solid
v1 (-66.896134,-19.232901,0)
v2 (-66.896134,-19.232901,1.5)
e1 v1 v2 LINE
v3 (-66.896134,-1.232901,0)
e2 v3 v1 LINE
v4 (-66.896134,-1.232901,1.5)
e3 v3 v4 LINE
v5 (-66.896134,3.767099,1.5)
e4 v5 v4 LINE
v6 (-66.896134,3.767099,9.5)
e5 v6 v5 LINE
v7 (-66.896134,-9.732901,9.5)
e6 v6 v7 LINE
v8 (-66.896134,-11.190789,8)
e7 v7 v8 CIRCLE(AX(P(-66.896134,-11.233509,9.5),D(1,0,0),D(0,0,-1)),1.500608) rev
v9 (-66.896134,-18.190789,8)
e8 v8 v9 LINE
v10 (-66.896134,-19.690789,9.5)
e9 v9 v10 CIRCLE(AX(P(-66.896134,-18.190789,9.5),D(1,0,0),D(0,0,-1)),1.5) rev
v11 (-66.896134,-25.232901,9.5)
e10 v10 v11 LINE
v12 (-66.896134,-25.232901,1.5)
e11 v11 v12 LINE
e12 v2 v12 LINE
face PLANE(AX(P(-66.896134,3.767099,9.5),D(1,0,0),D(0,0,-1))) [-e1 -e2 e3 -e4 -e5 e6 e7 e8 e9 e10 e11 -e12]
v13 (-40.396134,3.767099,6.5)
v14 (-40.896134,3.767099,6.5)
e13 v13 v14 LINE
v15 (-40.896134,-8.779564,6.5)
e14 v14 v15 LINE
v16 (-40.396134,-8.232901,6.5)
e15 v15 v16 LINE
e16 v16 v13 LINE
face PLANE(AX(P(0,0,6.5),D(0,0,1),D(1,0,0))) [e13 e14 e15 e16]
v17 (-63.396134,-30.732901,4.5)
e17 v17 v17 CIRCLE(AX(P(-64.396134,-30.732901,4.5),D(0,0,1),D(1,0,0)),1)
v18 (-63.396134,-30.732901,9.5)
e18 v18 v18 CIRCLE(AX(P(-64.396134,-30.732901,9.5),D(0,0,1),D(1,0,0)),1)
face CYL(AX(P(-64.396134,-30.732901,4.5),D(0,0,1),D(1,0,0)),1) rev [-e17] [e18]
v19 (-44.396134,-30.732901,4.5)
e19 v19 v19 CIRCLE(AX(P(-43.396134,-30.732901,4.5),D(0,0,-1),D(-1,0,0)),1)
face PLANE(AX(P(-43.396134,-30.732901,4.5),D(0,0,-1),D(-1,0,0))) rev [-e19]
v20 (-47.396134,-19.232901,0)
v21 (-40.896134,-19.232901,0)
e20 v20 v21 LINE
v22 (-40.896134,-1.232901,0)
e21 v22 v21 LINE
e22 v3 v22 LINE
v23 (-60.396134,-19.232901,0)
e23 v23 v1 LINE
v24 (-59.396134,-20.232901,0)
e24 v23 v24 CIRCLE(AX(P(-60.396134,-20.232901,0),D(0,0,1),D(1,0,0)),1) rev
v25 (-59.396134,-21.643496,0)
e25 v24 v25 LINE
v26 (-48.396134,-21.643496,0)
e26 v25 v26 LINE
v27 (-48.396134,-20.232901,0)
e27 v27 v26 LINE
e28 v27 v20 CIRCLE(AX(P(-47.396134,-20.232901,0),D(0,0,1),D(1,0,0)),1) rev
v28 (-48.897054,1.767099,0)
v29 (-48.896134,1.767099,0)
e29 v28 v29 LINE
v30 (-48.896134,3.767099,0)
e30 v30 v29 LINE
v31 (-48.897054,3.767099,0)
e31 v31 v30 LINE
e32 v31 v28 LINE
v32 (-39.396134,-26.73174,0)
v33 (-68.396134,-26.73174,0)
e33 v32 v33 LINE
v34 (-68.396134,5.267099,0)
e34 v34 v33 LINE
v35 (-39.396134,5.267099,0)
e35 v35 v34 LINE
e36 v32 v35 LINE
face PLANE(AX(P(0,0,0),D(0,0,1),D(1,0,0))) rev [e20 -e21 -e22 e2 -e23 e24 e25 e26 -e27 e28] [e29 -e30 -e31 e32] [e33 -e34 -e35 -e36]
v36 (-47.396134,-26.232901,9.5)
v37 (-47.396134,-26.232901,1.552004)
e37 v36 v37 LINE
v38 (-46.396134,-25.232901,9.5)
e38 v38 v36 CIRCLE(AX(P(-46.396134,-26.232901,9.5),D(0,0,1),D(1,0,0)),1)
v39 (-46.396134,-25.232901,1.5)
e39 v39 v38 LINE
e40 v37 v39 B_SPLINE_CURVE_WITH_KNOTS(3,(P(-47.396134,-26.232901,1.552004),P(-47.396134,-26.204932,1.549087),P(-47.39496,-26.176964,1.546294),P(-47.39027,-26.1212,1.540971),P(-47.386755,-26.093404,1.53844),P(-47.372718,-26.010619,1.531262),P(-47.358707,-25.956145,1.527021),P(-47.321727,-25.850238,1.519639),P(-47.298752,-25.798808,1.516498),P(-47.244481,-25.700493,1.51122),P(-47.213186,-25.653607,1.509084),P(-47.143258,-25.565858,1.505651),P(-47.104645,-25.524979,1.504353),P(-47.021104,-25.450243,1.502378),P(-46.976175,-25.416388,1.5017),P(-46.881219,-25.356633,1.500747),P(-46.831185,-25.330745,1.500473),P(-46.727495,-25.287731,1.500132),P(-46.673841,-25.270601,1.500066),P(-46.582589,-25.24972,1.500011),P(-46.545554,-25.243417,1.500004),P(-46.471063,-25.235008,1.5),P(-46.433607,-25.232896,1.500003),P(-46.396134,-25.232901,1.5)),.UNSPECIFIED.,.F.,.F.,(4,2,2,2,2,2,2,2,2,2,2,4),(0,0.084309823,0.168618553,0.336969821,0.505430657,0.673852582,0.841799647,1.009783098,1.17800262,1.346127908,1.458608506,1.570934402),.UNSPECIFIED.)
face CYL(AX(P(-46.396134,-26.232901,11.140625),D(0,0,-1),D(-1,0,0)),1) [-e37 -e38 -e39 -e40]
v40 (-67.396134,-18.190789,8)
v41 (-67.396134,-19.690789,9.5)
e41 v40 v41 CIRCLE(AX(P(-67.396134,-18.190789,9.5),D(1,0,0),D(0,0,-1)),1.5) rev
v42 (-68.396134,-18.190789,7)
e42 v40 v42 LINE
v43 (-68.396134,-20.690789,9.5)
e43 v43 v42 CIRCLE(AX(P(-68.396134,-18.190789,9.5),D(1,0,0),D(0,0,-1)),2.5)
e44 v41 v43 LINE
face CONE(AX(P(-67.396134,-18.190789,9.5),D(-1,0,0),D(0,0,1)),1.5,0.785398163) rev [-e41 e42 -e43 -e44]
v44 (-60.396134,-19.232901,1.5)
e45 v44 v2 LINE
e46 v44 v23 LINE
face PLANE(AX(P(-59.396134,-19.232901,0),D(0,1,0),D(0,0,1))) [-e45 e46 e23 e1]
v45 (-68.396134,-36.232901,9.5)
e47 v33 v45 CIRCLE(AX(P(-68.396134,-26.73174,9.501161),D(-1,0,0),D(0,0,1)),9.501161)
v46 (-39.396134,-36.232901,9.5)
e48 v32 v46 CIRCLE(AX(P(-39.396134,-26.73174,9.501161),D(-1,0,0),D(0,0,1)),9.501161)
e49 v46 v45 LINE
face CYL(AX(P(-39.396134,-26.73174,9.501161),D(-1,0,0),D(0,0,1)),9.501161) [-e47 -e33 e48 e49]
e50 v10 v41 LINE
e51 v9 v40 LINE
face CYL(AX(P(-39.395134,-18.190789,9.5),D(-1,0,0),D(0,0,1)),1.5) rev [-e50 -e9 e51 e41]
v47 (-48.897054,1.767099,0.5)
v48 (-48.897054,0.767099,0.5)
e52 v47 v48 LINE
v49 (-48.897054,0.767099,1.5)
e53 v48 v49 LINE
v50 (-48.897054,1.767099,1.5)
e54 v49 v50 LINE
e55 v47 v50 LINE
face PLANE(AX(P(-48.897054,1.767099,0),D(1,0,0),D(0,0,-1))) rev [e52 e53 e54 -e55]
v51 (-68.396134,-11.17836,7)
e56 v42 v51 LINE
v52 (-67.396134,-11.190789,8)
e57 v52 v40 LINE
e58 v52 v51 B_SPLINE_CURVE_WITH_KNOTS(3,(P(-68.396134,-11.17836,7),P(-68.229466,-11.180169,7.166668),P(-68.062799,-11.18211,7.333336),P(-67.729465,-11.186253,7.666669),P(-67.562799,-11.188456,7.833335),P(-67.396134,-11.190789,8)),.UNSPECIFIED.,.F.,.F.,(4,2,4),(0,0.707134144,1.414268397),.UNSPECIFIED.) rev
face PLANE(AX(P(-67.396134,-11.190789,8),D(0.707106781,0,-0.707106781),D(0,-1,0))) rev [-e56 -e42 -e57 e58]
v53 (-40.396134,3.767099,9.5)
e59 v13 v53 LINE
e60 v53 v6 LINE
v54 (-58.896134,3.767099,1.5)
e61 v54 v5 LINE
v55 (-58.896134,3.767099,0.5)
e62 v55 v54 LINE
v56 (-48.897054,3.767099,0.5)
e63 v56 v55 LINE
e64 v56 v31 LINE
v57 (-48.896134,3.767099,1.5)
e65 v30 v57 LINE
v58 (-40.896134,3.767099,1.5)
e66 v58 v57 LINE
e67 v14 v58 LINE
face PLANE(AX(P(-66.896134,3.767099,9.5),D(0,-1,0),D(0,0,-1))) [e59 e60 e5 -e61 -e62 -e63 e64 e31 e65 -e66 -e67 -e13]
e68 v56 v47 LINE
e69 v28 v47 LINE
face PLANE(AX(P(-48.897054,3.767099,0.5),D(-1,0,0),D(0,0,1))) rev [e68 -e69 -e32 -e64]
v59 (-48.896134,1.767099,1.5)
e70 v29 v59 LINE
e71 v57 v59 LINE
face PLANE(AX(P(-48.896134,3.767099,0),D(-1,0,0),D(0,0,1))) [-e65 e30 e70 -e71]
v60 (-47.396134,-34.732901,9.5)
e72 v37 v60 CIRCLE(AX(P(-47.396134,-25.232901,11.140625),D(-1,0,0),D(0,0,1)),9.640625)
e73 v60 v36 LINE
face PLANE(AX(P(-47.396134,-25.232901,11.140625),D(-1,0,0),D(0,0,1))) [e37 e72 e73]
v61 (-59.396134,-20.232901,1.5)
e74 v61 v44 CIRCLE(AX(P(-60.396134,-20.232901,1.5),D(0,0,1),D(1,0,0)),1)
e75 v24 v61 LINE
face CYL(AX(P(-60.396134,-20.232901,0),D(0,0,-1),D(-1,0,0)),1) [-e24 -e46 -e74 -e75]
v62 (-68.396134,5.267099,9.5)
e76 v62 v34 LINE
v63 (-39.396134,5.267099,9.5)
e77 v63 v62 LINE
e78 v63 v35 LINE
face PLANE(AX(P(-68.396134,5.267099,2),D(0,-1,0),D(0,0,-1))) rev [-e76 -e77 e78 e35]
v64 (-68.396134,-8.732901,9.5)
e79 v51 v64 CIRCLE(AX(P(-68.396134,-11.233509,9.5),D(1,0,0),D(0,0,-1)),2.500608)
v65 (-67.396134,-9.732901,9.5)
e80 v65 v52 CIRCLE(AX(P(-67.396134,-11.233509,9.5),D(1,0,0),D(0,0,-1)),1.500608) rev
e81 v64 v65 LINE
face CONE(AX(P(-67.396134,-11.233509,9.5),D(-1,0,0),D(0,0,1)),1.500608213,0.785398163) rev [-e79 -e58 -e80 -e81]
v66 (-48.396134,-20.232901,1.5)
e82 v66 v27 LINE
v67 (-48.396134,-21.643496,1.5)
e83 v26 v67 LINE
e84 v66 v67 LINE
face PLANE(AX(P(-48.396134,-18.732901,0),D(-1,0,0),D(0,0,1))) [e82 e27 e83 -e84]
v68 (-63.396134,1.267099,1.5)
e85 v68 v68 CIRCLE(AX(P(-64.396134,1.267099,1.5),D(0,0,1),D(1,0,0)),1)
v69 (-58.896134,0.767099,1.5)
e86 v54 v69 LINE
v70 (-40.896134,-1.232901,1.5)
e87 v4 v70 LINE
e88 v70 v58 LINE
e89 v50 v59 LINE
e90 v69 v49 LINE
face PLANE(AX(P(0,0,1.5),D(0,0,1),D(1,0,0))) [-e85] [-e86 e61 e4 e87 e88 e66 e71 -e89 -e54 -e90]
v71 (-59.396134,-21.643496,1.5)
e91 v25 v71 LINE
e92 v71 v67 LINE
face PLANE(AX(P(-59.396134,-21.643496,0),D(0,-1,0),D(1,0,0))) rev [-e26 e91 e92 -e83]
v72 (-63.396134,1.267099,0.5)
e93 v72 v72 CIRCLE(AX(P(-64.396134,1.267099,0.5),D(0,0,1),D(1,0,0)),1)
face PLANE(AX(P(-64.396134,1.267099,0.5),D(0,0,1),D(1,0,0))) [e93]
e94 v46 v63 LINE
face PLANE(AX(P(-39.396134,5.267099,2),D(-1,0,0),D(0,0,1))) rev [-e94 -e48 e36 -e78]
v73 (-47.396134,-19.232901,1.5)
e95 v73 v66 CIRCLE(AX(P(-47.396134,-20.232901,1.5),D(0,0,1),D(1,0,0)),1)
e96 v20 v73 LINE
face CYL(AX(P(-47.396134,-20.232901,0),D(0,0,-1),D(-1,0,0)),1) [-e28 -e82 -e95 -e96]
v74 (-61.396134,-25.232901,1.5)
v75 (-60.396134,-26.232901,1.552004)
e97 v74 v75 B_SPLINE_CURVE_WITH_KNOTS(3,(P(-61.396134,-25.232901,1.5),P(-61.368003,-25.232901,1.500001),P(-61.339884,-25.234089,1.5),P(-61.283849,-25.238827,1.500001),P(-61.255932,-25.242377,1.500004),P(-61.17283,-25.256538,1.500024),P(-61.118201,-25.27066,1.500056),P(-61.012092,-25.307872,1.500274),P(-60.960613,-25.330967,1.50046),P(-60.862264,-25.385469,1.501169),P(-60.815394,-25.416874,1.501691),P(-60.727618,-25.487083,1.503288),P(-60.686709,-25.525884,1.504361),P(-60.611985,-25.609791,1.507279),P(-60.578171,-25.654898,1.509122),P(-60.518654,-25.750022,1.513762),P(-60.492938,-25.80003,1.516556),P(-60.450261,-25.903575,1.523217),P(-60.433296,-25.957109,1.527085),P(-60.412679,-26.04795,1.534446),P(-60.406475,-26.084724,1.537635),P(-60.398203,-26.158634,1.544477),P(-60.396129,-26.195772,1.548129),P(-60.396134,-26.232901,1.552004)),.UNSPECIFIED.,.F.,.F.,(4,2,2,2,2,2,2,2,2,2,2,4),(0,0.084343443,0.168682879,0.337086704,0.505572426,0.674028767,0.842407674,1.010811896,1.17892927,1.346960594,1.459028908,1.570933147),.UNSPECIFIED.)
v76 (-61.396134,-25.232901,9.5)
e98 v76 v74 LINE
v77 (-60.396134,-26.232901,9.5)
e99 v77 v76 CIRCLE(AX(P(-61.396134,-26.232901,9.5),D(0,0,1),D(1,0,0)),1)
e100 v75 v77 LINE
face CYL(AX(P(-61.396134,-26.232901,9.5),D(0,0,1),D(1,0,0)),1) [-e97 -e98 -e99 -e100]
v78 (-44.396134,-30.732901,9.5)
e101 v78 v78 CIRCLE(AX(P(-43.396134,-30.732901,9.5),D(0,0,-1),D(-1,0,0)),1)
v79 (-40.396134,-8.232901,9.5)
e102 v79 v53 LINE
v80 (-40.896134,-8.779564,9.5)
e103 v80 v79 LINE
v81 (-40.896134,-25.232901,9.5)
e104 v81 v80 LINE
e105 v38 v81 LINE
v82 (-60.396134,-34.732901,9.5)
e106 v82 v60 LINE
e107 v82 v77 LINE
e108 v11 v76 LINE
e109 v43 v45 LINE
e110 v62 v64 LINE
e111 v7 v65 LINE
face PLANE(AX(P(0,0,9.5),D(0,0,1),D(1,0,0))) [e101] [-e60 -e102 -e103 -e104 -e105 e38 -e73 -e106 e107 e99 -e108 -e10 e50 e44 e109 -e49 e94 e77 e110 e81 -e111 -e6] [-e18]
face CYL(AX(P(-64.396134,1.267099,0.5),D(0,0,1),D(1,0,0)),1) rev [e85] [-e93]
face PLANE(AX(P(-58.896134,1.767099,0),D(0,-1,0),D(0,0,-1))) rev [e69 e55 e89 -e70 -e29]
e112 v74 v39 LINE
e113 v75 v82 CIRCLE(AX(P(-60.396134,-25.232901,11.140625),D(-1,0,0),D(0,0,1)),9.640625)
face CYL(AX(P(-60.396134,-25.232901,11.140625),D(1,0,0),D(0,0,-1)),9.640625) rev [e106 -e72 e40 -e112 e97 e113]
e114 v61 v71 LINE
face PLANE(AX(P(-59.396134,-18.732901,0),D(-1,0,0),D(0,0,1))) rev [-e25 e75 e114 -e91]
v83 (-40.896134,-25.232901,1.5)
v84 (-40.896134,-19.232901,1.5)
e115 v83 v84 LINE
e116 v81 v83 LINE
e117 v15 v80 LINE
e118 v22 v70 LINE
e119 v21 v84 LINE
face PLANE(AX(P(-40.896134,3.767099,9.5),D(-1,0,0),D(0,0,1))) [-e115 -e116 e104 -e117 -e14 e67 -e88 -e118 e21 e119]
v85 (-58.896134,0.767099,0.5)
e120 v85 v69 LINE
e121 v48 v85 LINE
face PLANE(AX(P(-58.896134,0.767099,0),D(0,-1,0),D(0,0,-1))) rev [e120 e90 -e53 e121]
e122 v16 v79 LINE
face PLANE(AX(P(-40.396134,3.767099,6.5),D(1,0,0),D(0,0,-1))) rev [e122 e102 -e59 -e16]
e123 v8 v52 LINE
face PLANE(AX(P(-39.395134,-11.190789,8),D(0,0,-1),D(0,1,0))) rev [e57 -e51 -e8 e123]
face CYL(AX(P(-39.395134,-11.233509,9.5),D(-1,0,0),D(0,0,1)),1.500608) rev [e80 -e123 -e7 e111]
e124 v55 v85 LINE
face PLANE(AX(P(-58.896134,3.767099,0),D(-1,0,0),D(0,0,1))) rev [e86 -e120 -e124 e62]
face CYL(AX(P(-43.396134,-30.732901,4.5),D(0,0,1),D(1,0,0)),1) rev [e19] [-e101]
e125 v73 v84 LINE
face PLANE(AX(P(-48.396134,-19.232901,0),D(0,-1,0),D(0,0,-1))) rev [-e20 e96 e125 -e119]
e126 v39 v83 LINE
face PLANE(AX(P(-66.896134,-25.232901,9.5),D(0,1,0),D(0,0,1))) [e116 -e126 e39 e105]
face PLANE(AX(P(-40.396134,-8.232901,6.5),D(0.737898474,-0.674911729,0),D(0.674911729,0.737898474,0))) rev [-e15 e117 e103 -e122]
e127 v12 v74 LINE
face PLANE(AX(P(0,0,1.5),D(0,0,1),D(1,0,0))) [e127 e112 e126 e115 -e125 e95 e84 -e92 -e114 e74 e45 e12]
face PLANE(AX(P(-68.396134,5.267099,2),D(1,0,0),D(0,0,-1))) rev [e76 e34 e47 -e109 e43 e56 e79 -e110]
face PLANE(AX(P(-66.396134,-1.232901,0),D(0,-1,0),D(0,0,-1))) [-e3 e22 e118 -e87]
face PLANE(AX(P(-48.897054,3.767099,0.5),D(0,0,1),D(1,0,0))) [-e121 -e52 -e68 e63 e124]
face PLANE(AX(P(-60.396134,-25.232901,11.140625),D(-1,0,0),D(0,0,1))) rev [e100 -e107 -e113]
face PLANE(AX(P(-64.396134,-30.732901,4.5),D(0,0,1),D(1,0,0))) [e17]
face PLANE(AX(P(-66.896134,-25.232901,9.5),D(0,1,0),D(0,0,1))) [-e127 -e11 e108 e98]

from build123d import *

# Parameters (mm, degrees)
SKETCH_1_W           = 29
SKETCH_1_H           = 32
EXTRUDE_1_DEPTH      = 2
SKETCH_3_W           = 29
SKETCH_3_H           = 32
SKETCH_3_W_2         = 26
SKETCH_3_H_2         = 29
EXTRUDE_1_2_DEPTH    = 7.5
SKETCH_4_W           = 26
SKETCH_4_H           = 29
CUT_EXTRUDE_1_DEPTH  = 0.5
SKETCH_5_W           = 10
SKETCH_5_H           = 2
CUT_EXTRUDE_2_DEPTH  = 74.869338639
SKETCH_10_W          = 0.5
SKETCH_10_H          = 17.5
CUT_EXTRUDE_3_DEPTH  = 74.869338639
SKETCH_11_W          = 9.999080609
SKETCH_11_H          = 1
CUT_EXTRUDE_4_DEPTH  = 74.869338639
SKETCH_12_W          = 29
SKETCH_12_H          = 9.5
EXTRUDE_2_DEPTH      = 9.5
CUT_EXTRUDE_5_DEPTH  = 48.371648808
CUT_EXTRUDE_7_DEPTH  = 3
SKETCH_17_W          = 9.999080609
SKETCH_17_H          = 0.5
EXTRUDE_3_DEPTH      = 3
SKETCH_18_R          = 1
CUT_EXTRUDE_10_DEPTH = 1
SKETCH_19_R          = 1
CUT_EXTRUDE_11_DEPTH = 5
CUT_EXTRUDE_12_REACH = 49.372
CHAMFER_START        = -55.080884848
CHAMFER_2_3_DEPTH    = 1.767766953
CHAMFER_START_2      = -53.313117895
CHAMFER_2_4_DEPTH    = 0.35355339
CUT_EXTRUDE_START    = -8
CUT_EXTRUDE_13_DEPTH = 13
FILLET_2_R           = 1
FILLET_3_R           = 1


with BuildPart() as part:
    # 草图1 → Extrude 1 (new body)
    with BuildSketch(Plane.XY):
        with Locations((-53.89613438, -10.732900943)):
            Rectangle(SKETCH_1_W, SKETCH_1_H)
    extrude(amount=EXTRUDE_1_DEPTH)

    # 草图3 → Extrude 1 2 (add)
    with BuildSketch(Plane.XY.offset(2)):
        with Locations((-53.89613438, -10.732900943)):
            Rectangle(SKETCH_3_W, SKETCH_3_H)
        with Locations((-53.89613438, -10.732900943)):
            Rectangle(SKETCH_3_W_2, SKETCH_3_H_2, mode=Mode.SUBTRACT)
    extrude(amount=EXTRUDE_1_2_DEPTH)

    # 草图4 → 切除-拉伸1 (cut)
    with BuildSketch(Plane.XY.offset(2)):
        with Locations((-53.89613438, -10.732900943)):
            Rectangle(SKETCH_4_W, SKETCH_4_H)
    extrude(amount=-CUT_EXTRUDE_1_DEPTH, mode=Mode.SUBTRACT)

    # 草图5 → 切除-拉伸2 (cut, through all)
    with BuildSketch(Plane.XY.offset(1.5)):
        Polygon((-66.39613438, -1.232900943), (-41.39613438, -1.232900943), (-41.39613438, -18.732900943), (-48.39613438, -18.732900943), (-48.39613438, -21.643495556), (-59.39613438, -21.643495556), (-59.39613438, -18.732900943), (-66.39613438, -18.732900943), align=None)
        with Locations((-53.89613438, 2.767099057)):
            Rectangle(SKETCH_5_W, SKETCH_5_H)
    extrude(amount=-CUT_EXTRUDE_2_DEPTH, mode=Mode.SUBTRACT)

    # 草图10 → 切除-拉伸3 (cut, through all)
    with BuildSketch(Plane.XY.offset(1.5)):
        Polygon((-59.39613438, -18.732900943), (-66.39613438, -18.732900943), (-66.89613438, -18.732900943), (-66.89613438, -19.232900943), (-59.39613438, -19.232900943), align=None)
        with Locations((-66.64613438, -9.982900943)):
            Rectangle(SKETCH_10_W, SKETCH_10_H)
        with Locations((-41.14613438, -9.982900943)):
            Rectangle(SKETCH_10_W, SKETCH_10_H)
        Polygon((-40.89613438, -18.732900943), (-41.39613438, -18.732900943), (-48.39613438, -18.732900943), (-48.39613438, -19.232900943), (-40.89613438, -19.232900943), align=None)
    extrude(amount=-CUT_EXTRUDE_3_DEPTH, mode=Mode.SUBTRACT)

    # 草图11 → 切除-拉伸4 (cut, through all)
    with BuildSketch(Plane.XY.offset(1.5)):
        with Locations((-53.896594076, 1.267099057)):
            Rectangle(SKETCH_11_W, SKETCH_11_H)
    extrude(amount=-CUT_EXTRUDE_4_DEPTH, mode=Mode.SUBTRACT)

    # 草图12 → 凸台-拉伸2 (add)
    with BuildSketch(Plane.XZ.offset(26.732900943)):
        with Locations((-53.89613438, 4.75)):
            Rectangle(SKETCH_12_W, SKETCH_12_H)
    extrude(amount=EXTRUDE_2_DEPTH)

    # 草图14 → 切除-拉伸5 (cut, through all)
    with BuildSketch(Plane.ZY.offset(68.39613438)):
        with BuildLine():
            Line((0, -36.232900943), (0, -26.731740267))
            ThreePointArc((0, -26.731740267), (2.78241518, -33.449665062), (9.5, -36.232900943))
            Line((9.5, -36.232900943), (0, -36.232900943))
        make_face()
    extrude(amount=-CUT_EXTRUDE_5_DEPTH, mode=Mode.SUBTRACT)

    # 草图16 → 切除-拉伸7 (cut)
    with BuildSketch(Plane.XY.offset(9.5)):
        Polygon((-40.39613438, -8.232900943), (-40.89613438, -8.779563893), (-40.89613438, -8.232900943), (-40.89613438, 3.767099057), (-40.39613438, 3.767099057), align=None)
    extrude(amount=-CUT_EXTRUDE_7_DEPTH, mode=Mode.SUBTRACT)

    # 草图17 → 凸台-拉伸3 (add)
    with BuildSketch(Plane(origin=(0, 0.767099057, 0), x_dir=(1, 0, 0), z_dir=(0, 1, 0))):
        with Locations((-53.896594076, -0.25)):
            Rectangle(SKETCH_17_W, SKETCH_17_H)
    extrude(amount=EXTRUDE_3_DEPTH)

    # 草图18 → 切除-拉伸10 (cut)
    with BuildSketch(Plane.XY.offset(1.5)):
        with Locations((-64.39613438, 1.267099057)):
            Circle(SKETCH_18_R)
    extrude(amount=-CUT_EXTRUDE_10_DEPTH, mode=Mode.SUBTRACT)

    # 草图19 → 切除-拉伸11 (cut)
    with BuildSketch(Plane.XY.offset(9.5)):
        with Locations((-64.39613438, -30.732900943)):
            Circle(SKETCH_19_R)
        with Locations(Location((-43.39613438, -30.732900943, 0), (0, 0, 180))):
            Circle(SKETCH_19_R)
    extrude(amount=-CUT_EXTRUDE_11_DEPTH, mode=Mode.SUBTRACT)

    # 草图15 → 切除-拉伸12 (cut, up to next)
    with BuildSketch(Plane.ZY.offset(68.39613438), mode=Mode.PRIVATE) as cut_extrude_12_sk1:
        with BuildLine():
            Line((8, -11.190789021), (8, -18.190789021))
            ThreePointArc((8, -18.190789021), (8.439339828, -19.251449193), (9.5, -19.690789021))
            Line((9.5, -19.690789021), (9.5, -9.732900943))
            ThreePointArc((9.5, -9.732900943), (8.454122659, -10.157421057), (8, -11.190789021))
        make_face()
    cut_extrude_12_tool1 = extrude(cut_extrude_12_sk1.sketch, amount=-CUT_EXTRUDE_12_REACH, mode=Mode.PRIVATE) & part.part
    add(cut_extrude_12_tool1.solids().sort_by_distance((-68.396134, -14.711699, 8.778661))[0], mode=Mode.SUBTRACT)

    # 倒角2: read off the stored shape, not the designer's step
    # 倒角2 outline → 倒角2 (revolve, cut)
    with BuildSketch(Plane(origin=(0, -11.233509157, 9.5), x_dir=(0, 1, 0), z_dir=(0, 0, -1))):
        Polygon((2.500608213, -68.39613438), (1.500608213, -67.39613438), (1.500608213, -68.39613438), align=None)
    revolve(axis=Axis((0, -11.233509157, 9.5), (1, 0, 0)), mode=Mode.SUBTRACT)

    # Chamfer 2 2 outline → Chamfer 2 2 (revolve, cut)
    with BuildSketch(Plane(origin=(0, -18.190789021, 9.5), x_dir=(0, 1, 0), z_dir=(0, 0, -1))):
        Polygon((2.5, -68.39613438), (1.5, -67.39613438), (1.5, -68.39613438), align=None)
    revolve(axis=Axis((0, -18.190789021, 9.5), (1, 0, 0)), mode=Mode.SUBTRACT)

    # Chamfer 2 3 outline → Chamfer 2 3 (cut)
    with BuildSketch(Plane(origin=(0, 0, 0), x_dir=(0.7071067811865444, 0, 0.7071067811865507), z_dir=(0.7071067811865506, 0, -0.7071067811865446)).offset(CHAMFER_START)):
        with BuildLine():
            Line((-43.413622959, 18.190789021), (-43.413622959, 11.178359935))
            add(Edge.make_bspline(
                [(-43.413622959, 11.178359935), (-43.177918414, 11.180169446), (-42.94221502, 11.182109959), (-42.4708105, 11.186252987), (-42.235109372, 11.188455503), (-41.999409396, 11.190789021)],
                knots=[0, 0, 0, 0, 0.707134144, 0.707134144, 1.414268397, 1.414268397, 1.414268397, 1.414268397], degree=3))
            Line((-41.999409396, 11.190789021), (-41.999409396, 18.190789021))
            Line((-41.999409396, 18.190789021), (-43.413622959, 18.190789021))
        make_face()
    extrude(amount=CHAMFER_2_3_DEPTH, mode=Mode.SUBTRACT)

    # Chamfer 2 4 outline → Chamfer 2 4 (add)
    with BuildSketch(Plane(origin=(0, 0, 0), x_dir=(0.7071067811865444, 0, 0.7071067811865507), z_dir=(0.7071067811865506, 0, -0.7071067811865446)).offset(CHAMFER_START_2)):
        with BuildLine():
            Line((-43.413622959, 18.190789021), (-43.413622959, 11.178359935))
            add(Edge.make_bspline(
                [(-43.413622959, 11.178359935), (-43.177918414, 11.180169446), (-42.94221502, 11.182109959), (-42.4708105, 11.186252987), (-42.235109372, 11.188455503), (-41.999409396, 11.190789021)],
                knots=[0, 0, 0, 0, 0.707134144, 0.707134144, 1.414268397, 1.414268397, 1.414268397, 1.414268397], degree=3))
            Line((-41.999409396, 11.190789021), (-41.999409396, 18.190789021))
            Line((-41.999409396, 18.190789021), (-43.413622959, 18.190789021))
        make_face()
    extrude(amount=CHAMFER_2_4_DEPTH)

    # 草图21 → 切除-拉伸13 (cut)
    with BuildSketch(Plane(origin=(-39.39613438, 0, 0), x_dir=(0, 0, -1), z_dir=(1, 0, 0)).offset(CUT_EXTRUDE_START)):
        with BuildLine():
            Line((-9.5, -34.732900943), (-9.5, -25.232900943))
            Line((-9.5, -25.232900943), (-1.5, -25.232900943))
            ThreePointArc((-1.5, -25.232900943), (-3.766402981, -31.442772118), (-9.5, -34.732900943))
        make_face()
    extrude(amount=-CUT_EXTRUDE_13_DEPTH, mode=Mode.SUBTRACT)

    # 圆角2
    fillet_2_edges = [part.edges().sort_by_distance(p)[0] for p in [
        (-59.39613438, -19.232900943, 0.75),
        (-48.39613438, -19.232900943, 0.75),
    ]]
    fillet(fillet_2_edges, radius=FILLET_2_R)

    # 圆角3
    fillet_3_edges = [part.edges().sort_by_distance(p)[0] for p in [
        (-47.39613438, -25.232900943, 5.5),
        (-60.39613438, -25.232900943, 5.5),
    ]]
    fillet(fillet_3_edges, radius=FILLET_3_R)


solid = part.part
